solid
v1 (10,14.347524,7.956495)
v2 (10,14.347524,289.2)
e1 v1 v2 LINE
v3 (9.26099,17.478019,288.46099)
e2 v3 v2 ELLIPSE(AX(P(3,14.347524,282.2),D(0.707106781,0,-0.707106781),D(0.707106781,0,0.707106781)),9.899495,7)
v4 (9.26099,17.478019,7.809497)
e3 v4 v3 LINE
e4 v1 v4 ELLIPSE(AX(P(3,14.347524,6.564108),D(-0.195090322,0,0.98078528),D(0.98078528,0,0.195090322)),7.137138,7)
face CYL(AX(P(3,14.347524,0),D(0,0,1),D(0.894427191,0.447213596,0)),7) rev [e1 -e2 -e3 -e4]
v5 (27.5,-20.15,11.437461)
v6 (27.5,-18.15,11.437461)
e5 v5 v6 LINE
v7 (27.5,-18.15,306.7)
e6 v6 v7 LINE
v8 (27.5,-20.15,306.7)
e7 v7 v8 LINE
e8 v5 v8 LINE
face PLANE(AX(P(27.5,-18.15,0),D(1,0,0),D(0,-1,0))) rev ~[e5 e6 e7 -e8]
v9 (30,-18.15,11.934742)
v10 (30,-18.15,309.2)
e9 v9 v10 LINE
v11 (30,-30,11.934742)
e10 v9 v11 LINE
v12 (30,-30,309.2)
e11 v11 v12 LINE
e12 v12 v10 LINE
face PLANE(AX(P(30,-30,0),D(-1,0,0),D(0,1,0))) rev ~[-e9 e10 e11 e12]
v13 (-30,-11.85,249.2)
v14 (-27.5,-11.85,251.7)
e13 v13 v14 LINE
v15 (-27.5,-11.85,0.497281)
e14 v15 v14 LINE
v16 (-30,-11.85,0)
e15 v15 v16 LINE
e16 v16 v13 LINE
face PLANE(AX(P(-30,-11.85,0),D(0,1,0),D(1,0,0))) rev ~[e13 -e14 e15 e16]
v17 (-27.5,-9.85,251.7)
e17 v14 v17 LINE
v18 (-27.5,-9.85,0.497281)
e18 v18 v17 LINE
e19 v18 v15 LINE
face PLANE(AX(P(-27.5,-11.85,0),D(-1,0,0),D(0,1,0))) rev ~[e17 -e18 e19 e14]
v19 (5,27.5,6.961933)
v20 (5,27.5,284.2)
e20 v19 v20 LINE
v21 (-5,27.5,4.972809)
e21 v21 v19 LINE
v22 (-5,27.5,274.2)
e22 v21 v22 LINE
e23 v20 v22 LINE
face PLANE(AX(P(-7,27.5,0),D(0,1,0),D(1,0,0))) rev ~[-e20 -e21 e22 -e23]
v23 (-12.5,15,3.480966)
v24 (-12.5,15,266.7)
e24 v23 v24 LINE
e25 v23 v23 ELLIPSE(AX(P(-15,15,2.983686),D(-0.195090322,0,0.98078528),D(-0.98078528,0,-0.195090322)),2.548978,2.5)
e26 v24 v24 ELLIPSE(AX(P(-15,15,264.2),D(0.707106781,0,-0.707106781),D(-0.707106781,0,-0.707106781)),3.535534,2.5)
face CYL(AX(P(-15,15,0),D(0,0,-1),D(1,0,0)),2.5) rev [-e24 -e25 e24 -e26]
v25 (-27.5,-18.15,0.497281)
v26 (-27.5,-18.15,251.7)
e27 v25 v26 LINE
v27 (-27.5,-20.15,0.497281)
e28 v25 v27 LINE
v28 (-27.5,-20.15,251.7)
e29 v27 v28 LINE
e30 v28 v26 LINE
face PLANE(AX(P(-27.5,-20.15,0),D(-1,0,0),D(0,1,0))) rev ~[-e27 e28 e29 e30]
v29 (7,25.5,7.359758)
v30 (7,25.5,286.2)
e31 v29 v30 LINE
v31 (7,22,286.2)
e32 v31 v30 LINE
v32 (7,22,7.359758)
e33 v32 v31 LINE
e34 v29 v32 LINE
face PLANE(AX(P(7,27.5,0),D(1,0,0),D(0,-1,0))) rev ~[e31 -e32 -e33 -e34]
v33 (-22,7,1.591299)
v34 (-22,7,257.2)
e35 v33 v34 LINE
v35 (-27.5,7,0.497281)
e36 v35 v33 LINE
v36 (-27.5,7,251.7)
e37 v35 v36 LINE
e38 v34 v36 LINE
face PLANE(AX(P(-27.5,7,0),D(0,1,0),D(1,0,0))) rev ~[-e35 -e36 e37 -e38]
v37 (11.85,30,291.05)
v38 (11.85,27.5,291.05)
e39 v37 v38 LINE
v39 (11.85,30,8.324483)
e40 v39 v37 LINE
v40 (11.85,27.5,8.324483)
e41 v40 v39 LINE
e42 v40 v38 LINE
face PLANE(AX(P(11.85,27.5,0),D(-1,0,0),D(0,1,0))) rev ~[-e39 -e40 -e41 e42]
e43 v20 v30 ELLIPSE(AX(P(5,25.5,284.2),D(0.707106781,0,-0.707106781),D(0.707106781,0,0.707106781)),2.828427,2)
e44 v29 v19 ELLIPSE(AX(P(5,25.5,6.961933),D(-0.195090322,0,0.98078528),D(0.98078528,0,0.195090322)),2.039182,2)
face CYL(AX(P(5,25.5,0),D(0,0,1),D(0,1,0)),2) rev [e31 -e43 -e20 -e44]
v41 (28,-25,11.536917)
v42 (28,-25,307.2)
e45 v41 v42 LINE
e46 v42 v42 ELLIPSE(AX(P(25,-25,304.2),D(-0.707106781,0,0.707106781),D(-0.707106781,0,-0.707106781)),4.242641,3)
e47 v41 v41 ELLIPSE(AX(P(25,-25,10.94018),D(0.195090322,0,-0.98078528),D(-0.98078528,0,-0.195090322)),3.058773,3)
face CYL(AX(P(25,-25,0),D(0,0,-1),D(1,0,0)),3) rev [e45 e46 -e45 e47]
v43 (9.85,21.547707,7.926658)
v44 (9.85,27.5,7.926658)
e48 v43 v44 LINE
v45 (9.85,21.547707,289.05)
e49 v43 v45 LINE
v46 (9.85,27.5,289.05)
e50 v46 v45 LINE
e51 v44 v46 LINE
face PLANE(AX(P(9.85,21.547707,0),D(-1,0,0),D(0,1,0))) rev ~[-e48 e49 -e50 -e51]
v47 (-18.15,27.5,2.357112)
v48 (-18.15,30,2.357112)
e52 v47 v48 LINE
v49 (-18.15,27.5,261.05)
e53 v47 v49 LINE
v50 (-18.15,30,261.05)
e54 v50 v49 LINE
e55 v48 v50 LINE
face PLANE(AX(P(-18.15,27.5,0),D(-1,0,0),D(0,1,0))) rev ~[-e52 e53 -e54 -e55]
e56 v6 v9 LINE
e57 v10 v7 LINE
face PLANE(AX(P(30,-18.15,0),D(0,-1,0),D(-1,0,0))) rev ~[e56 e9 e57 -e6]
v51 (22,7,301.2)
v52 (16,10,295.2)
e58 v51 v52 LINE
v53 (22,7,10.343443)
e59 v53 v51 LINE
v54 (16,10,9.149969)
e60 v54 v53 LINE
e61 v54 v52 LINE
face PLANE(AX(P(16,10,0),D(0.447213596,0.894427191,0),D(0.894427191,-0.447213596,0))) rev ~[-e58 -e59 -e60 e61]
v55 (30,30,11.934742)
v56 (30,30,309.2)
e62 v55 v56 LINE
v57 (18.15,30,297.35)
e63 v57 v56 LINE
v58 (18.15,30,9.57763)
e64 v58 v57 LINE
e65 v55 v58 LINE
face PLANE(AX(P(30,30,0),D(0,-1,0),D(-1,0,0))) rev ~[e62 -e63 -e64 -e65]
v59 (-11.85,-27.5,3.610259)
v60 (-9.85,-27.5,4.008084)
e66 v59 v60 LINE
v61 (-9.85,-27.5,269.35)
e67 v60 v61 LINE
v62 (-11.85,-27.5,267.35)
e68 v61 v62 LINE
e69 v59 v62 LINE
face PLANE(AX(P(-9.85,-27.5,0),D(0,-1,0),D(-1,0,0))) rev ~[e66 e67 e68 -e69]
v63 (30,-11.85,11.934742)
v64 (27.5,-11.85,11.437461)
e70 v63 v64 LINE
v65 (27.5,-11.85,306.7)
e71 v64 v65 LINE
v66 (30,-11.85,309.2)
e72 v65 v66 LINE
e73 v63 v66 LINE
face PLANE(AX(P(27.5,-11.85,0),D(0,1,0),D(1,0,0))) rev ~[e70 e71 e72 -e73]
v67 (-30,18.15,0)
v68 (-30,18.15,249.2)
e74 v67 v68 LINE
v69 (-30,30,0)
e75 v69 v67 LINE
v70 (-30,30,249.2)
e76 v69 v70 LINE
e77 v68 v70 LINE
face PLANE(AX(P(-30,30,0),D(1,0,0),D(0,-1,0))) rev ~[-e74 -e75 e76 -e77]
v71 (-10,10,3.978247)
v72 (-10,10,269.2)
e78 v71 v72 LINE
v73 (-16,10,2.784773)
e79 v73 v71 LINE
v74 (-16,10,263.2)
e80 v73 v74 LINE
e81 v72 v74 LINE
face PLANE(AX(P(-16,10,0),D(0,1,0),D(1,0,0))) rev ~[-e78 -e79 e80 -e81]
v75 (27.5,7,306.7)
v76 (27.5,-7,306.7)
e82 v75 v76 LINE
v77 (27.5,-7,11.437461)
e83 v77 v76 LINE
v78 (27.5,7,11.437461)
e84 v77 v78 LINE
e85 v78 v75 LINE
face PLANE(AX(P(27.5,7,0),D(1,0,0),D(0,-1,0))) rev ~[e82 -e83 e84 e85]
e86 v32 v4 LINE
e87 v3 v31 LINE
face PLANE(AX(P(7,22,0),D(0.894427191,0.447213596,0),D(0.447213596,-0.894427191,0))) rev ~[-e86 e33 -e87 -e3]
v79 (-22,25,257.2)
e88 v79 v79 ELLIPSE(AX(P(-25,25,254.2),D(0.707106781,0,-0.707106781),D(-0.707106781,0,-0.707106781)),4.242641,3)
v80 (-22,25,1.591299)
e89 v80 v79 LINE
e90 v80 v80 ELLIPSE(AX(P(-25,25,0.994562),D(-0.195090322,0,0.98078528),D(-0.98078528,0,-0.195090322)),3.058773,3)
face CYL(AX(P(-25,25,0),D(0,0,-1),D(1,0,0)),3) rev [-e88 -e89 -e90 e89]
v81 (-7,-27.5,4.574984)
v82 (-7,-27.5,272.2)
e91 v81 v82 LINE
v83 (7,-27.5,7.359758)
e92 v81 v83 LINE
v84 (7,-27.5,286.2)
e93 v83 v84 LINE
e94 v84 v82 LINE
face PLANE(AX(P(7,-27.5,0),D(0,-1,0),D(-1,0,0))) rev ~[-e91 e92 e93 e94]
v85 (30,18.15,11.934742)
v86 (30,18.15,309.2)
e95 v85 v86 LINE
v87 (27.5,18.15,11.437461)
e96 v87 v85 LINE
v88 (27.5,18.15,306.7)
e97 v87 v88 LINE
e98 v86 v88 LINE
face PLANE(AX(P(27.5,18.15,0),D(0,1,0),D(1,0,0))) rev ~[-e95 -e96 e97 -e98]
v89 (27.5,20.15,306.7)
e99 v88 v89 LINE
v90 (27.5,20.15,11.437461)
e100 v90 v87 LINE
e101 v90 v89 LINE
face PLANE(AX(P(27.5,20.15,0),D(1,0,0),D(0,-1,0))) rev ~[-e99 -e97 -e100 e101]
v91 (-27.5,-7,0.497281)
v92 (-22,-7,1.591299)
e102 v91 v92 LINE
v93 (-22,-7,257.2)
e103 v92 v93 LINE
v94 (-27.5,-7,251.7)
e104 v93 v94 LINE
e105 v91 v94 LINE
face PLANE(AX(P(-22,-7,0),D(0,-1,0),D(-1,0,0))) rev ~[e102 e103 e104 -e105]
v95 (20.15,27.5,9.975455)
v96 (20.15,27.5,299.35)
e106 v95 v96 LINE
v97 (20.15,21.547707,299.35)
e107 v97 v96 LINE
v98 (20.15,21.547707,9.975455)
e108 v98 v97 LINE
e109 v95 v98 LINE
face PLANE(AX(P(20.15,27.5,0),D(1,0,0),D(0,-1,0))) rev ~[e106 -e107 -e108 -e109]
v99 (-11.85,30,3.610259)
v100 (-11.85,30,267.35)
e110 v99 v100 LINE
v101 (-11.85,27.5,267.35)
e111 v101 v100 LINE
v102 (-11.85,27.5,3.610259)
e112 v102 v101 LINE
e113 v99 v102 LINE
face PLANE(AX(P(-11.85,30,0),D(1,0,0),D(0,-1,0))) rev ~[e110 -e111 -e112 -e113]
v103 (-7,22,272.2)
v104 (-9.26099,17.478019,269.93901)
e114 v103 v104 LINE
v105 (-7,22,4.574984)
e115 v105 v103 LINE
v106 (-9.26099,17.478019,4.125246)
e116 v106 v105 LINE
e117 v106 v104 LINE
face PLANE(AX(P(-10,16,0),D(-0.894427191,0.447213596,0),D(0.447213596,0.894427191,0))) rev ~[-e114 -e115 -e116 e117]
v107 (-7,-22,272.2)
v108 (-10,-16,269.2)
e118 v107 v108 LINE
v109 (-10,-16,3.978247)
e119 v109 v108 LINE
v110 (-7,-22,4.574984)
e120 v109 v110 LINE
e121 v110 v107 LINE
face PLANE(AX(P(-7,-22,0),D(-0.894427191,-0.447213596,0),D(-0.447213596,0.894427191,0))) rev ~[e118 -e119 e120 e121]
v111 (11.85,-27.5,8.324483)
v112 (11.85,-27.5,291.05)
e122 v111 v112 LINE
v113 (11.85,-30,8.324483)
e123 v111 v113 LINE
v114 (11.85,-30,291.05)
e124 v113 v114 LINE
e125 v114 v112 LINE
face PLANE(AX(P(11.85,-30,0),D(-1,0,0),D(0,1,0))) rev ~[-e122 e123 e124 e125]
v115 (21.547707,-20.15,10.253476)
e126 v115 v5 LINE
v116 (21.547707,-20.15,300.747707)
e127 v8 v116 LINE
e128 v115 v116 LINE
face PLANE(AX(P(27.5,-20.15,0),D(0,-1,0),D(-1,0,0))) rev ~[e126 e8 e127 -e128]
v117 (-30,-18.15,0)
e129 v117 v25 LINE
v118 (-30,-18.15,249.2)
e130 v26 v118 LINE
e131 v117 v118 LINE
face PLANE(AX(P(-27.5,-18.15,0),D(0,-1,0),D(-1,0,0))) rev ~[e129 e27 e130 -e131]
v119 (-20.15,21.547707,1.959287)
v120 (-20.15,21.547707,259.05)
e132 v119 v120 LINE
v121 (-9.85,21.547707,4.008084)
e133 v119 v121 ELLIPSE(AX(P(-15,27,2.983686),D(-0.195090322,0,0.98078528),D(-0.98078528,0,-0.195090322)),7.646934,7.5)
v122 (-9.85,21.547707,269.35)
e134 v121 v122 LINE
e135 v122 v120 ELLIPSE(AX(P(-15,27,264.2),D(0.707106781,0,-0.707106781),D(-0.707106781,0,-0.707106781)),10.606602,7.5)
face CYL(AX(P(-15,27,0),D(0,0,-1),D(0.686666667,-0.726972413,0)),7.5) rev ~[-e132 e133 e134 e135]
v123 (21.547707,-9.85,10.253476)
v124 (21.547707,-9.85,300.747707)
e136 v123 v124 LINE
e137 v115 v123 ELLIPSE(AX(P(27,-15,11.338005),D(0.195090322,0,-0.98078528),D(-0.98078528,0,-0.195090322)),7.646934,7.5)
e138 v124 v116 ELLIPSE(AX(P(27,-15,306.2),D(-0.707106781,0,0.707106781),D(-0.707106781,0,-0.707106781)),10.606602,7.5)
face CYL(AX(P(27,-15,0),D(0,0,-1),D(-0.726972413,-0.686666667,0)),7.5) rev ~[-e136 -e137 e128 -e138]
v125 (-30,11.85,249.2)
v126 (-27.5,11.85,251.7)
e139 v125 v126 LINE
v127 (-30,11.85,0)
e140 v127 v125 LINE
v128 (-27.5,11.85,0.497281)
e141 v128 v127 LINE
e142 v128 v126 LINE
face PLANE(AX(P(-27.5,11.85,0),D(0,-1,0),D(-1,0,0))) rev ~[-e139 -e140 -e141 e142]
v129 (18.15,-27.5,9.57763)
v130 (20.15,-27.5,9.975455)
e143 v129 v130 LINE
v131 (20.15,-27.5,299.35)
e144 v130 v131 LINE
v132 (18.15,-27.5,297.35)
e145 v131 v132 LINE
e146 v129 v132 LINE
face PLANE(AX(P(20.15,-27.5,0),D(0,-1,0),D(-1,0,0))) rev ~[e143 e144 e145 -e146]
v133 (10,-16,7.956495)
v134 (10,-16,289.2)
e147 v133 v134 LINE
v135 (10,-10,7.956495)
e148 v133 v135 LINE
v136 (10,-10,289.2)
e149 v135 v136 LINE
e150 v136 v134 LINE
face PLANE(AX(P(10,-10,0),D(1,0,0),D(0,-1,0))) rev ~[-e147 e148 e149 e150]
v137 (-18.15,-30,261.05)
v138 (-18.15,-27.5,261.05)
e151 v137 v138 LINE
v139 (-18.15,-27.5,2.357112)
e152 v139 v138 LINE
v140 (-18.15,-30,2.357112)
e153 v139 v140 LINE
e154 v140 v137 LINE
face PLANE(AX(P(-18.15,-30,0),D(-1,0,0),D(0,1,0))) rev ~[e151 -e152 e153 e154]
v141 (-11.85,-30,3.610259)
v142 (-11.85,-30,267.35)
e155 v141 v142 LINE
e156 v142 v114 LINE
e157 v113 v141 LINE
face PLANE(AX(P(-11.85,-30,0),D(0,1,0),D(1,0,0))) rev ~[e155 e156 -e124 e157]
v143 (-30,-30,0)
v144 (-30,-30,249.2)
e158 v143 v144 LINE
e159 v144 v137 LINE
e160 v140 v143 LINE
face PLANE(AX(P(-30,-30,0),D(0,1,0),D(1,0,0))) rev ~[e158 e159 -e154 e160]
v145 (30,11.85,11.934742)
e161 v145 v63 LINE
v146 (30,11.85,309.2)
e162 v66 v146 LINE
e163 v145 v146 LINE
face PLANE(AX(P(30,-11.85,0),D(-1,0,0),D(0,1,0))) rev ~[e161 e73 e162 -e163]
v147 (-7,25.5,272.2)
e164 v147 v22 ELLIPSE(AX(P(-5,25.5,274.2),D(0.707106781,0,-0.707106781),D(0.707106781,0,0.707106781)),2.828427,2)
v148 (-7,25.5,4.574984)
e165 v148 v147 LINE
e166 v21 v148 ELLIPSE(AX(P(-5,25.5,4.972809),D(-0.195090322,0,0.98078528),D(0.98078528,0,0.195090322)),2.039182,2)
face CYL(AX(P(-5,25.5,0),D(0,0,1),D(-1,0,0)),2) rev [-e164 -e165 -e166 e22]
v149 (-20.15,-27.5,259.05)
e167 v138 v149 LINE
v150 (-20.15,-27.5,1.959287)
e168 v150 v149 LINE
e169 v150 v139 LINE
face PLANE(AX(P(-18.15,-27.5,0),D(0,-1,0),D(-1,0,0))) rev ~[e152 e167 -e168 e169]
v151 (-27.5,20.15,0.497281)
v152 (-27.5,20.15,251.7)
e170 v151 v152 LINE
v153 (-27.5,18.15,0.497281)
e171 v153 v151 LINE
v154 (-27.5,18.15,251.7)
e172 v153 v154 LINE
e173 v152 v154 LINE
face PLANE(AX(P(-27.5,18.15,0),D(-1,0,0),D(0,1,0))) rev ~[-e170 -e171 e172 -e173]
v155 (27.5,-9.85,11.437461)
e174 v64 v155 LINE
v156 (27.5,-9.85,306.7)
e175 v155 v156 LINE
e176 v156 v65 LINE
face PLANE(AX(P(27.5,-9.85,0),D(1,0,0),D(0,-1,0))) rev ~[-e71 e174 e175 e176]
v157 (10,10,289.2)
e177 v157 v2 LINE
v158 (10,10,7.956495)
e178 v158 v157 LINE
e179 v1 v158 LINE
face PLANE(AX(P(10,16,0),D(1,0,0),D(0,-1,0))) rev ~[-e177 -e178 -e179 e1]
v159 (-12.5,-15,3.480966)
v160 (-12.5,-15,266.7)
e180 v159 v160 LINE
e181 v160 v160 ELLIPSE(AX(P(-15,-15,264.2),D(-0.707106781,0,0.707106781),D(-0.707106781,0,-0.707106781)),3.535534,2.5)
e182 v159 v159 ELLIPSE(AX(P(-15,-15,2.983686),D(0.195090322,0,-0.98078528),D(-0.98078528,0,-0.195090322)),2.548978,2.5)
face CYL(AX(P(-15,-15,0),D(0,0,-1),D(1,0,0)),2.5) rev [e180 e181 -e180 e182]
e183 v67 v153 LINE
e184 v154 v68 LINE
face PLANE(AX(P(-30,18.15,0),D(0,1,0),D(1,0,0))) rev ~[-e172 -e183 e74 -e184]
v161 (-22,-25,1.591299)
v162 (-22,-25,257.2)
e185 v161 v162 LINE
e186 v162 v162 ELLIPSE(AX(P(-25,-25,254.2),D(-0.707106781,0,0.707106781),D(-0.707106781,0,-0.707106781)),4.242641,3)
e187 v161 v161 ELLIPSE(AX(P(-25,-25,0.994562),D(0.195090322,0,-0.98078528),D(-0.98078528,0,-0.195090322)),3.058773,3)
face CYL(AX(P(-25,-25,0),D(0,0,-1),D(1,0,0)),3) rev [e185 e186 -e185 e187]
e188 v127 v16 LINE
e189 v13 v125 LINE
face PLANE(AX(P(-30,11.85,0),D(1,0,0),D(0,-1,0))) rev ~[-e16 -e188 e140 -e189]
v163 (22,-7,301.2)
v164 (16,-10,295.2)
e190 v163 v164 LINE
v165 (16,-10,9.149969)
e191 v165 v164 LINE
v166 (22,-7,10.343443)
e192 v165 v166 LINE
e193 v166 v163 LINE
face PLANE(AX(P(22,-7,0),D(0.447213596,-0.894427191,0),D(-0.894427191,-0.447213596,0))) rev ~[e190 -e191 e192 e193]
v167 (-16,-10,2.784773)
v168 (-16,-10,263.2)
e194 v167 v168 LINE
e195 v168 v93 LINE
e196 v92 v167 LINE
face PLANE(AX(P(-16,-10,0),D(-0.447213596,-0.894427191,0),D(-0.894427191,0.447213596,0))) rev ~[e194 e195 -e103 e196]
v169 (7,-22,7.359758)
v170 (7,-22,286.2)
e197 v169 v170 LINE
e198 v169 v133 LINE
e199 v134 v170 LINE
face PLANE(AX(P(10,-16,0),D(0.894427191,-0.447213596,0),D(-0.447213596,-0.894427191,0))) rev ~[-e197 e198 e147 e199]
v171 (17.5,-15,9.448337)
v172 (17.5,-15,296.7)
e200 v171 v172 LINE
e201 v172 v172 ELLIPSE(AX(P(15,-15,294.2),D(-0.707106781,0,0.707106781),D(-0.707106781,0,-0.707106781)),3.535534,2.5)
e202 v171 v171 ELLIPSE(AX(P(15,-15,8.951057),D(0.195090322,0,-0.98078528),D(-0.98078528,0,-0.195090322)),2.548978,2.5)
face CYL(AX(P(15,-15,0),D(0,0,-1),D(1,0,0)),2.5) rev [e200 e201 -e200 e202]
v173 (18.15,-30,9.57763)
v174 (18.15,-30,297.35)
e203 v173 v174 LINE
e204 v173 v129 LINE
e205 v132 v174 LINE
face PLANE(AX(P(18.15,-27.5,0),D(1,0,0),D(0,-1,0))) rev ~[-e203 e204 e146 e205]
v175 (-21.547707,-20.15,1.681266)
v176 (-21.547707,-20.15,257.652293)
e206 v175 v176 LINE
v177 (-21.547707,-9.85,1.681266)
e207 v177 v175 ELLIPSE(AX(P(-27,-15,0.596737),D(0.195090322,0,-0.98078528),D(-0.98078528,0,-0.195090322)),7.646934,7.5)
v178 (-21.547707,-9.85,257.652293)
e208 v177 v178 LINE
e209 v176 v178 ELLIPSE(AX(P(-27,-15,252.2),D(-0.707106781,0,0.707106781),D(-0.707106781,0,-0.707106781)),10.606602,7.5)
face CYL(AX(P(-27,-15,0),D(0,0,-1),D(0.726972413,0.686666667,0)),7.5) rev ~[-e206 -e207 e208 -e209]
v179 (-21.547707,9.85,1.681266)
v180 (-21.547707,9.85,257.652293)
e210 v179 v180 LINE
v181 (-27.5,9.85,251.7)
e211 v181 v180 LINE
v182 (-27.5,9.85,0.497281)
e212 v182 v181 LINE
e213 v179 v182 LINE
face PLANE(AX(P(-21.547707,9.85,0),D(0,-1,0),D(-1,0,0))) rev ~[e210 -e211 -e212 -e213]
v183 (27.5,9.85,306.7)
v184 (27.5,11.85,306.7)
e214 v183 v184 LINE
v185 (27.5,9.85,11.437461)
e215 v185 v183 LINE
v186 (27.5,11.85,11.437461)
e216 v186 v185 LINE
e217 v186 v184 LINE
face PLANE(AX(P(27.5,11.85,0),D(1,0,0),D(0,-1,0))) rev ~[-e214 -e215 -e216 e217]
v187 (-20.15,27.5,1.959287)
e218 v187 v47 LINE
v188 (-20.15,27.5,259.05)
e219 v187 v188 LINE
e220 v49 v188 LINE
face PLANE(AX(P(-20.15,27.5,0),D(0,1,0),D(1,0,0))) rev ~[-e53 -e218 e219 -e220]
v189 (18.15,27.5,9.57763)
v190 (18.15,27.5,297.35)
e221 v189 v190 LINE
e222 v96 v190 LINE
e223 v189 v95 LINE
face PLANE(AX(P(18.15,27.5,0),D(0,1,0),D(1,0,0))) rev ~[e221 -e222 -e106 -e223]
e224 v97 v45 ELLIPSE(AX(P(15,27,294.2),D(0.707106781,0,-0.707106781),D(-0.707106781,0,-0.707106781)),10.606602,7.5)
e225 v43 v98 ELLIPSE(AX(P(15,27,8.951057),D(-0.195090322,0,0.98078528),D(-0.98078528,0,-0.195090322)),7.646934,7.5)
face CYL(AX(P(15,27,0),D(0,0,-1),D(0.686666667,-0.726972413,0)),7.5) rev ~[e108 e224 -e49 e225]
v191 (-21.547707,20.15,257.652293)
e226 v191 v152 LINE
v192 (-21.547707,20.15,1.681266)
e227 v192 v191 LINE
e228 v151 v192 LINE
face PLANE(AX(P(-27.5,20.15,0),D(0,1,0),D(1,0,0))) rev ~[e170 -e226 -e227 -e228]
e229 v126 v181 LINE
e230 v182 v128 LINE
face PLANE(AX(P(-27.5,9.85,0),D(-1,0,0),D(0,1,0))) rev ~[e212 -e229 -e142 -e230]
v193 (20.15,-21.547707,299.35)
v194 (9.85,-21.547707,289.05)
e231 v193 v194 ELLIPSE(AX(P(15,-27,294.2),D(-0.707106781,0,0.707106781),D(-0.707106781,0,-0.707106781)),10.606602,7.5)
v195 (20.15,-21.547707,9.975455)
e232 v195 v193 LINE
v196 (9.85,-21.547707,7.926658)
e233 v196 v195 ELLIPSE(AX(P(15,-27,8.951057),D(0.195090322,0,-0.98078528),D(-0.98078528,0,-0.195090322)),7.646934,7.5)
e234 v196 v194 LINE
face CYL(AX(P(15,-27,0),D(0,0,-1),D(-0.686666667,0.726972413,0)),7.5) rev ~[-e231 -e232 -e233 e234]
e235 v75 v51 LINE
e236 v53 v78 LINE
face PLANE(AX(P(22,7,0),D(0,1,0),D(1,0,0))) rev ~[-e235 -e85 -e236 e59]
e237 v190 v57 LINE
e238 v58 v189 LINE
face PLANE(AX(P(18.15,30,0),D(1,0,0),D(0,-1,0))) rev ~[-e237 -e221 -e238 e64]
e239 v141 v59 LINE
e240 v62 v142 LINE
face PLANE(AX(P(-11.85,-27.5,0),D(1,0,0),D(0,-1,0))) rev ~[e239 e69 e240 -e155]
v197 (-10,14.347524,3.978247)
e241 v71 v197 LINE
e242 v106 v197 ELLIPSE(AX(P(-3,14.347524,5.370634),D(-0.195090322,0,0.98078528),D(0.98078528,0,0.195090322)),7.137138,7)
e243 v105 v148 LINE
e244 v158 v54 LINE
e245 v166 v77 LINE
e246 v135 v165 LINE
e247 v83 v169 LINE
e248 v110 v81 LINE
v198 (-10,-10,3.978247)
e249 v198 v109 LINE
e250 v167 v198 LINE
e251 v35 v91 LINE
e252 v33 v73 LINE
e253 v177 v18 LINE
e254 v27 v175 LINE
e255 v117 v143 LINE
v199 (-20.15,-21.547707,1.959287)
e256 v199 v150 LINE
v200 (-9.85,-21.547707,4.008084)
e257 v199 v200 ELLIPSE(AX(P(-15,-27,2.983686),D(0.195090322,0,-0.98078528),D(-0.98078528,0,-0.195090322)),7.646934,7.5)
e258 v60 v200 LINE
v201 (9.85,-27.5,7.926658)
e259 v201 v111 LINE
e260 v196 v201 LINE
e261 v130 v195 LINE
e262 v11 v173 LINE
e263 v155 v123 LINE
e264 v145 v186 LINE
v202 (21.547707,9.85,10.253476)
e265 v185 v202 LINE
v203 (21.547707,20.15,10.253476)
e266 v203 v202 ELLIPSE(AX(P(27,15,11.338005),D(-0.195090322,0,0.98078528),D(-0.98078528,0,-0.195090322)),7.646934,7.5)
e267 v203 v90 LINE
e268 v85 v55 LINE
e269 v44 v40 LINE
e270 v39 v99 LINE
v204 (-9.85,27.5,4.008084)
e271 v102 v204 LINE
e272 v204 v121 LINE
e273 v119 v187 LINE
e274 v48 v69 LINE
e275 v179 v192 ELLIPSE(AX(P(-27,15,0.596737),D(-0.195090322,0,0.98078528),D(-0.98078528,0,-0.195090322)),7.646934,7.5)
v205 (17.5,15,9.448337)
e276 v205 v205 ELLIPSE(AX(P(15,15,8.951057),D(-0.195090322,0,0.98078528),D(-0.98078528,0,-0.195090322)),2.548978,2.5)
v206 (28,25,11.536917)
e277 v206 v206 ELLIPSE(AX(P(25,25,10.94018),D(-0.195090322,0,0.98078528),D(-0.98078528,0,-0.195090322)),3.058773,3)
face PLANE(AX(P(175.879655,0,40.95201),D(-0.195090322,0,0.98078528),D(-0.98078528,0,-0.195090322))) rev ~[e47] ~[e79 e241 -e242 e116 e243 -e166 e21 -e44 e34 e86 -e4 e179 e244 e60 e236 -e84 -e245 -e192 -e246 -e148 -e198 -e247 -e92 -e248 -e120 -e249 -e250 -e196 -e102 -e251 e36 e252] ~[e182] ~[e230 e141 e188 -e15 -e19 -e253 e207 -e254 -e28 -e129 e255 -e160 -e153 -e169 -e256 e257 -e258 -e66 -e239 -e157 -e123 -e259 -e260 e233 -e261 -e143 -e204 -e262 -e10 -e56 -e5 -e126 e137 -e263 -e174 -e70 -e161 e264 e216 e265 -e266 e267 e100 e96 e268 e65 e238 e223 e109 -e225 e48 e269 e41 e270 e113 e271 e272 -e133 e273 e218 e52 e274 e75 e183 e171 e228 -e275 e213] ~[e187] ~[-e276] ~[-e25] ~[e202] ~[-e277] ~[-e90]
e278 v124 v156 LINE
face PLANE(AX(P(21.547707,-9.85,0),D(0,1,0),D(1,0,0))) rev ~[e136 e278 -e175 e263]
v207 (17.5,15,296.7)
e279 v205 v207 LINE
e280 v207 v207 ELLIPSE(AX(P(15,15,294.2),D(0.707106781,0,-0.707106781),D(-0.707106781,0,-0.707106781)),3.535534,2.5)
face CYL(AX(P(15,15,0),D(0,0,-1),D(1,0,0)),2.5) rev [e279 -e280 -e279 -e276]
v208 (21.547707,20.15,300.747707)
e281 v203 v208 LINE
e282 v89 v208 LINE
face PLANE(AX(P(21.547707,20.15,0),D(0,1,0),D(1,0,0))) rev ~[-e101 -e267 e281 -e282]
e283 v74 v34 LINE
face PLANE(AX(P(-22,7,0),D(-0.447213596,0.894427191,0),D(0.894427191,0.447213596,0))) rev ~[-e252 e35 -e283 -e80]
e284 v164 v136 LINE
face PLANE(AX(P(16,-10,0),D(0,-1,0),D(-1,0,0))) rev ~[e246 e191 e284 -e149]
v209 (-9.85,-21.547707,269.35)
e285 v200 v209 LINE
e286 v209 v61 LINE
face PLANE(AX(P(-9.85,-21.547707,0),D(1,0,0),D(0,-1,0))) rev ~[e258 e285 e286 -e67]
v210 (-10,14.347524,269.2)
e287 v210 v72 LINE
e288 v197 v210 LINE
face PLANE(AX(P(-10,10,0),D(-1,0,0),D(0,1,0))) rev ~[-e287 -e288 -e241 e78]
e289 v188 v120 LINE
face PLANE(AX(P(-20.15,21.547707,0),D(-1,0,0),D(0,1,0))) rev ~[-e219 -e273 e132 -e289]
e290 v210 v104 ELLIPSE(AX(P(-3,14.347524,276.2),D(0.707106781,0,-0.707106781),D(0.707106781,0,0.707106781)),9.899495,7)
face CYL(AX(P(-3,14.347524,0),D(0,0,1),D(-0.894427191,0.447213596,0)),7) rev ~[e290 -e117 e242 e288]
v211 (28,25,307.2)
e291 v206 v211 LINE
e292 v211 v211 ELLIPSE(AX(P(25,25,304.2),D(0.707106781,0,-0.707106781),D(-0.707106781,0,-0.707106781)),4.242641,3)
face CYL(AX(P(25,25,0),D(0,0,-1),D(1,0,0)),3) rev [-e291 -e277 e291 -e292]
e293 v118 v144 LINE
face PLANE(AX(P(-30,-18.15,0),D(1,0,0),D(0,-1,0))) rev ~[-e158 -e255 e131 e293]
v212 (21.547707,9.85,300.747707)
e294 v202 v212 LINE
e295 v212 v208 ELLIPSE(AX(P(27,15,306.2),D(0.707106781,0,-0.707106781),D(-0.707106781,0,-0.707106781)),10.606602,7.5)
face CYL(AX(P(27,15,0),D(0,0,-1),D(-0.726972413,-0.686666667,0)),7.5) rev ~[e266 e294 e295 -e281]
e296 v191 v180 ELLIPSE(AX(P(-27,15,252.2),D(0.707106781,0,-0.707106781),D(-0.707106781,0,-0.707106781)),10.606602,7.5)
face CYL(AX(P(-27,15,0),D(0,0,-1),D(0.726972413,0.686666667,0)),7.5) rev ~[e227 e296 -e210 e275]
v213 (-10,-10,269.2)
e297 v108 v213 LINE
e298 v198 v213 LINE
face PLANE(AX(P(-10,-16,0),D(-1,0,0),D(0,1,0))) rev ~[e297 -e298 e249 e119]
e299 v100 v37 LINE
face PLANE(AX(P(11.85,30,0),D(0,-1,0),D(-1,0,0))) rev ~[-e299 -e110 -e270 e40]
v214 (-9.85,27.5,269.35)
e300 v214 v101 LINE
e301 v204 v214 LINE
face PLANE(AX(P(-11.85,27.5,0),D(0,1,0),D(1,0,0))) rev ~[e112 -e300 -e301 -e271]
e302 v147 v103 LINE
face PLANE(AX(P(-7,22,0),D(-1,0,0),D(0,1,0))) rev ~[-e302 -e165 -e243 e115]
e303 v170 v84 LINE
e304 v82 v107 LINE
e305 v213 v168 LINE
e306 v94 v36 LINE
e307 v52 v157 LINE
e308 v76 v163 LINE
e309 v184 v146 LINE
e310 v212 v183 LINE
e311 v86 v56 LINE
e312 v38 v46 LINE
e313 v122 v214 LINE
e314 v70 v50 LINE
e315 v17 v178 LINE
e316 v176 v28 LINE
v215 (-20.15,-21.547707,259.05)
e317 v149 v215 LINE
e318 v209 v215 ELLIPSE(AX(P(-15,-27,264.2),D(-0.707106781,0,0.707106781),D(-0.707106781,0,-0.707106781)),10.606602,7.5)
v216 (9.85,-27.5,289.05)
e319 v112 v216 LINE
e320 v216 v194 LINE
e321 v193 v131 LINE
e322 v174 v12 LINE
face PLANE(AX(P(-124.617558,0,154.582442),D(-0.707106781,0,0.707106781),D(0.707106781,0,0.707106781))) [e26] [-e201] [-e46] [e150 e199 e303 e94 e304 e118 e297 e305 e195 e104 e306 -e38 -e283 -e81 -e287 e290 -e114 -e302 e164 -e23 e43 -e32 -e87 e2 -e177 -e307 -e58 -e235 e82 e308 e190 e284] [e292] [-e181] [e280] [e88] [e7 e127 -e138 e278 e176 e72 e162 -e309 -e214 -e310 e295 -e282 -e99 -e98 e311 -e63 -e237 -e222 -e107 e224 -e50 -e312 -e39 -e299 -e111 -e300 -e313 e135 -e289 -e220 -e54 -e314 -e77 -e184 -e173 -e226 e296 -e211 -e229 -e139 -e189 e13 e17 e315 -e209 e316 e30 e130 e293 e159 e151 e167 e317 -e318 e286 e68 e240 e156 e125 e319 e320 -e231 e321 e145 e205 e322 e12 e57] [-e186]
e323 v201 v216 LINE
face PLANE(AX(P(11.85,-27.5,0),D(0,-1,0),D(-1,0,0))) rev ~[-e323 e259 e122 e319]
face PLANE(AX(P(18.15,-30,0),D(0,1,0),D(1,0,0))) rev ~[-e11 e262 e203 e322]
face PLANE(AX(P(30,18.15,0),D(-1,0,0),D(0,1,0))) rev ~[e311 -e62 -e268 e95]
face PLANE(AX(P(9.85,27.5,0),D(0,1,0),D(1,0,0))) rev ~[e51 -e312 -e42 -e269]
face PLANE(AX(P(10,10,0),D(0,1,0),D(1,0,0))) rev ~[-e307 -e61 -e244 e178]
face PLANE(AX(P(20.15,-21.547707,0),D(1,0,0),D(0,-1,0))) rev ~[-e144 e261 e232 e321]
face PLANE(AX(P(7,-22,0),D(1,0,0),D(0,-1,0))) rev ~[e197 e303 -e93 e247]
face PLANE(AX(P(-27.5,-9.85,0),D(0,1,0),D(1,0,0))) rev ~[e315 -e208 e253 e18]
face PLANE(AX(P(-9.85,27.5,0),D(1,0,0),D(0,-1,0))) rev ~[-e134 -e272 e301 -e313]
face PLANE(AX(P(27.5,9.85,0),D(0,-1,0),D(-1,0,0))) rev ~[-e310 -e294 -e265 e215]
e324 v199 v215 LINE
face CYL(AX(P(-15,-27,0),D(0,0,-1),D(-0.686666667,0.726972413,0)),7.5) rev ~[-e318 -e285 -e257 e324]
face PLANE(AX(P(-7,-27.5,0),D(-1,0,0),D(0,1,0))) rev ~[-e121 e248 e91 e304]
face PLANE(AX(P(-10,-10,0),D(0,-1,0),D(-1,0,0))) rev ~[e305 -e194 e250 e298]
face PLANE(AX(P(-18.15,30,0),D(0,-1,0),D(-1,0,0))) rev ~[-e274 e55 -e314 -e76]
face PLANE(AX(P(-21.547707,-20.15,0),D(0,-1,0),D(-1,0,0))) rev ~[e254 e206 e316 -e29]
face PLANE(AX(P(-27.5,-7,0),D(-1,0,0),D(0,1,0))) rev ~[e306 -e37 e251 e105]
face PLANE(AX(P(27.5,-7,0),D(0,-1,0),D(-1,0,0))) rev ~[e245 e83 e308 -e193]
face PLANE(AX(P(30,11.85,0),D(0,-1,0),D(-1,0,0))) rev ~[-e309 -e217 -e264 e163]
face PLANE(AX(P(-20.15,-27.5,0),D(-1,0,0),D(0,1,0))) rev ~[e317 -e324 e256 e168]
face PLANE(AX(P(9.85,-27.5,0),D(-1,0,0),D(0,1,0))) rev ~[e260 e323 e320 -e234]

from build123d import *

# Parameters (mm, degrees)
F0_R          = 3
F0_R_2        = 2.5
F1_DEPTH      = 309.2
F2_R          = 2
F3_R          = 7
F6_DEPTH      = 30
F6_DEPTH_BACK = 30


# Not quite as in the source:
# - a feature names something its author has since deleted; it is built from what else it names


with BuildPart() as f1:
    # F0 (on Top) → F1 (new body)
    with BuildSketch(Plane.XY):
        with BuildLine():
            Line((18.15, -30), (30, -30))
            Line((30, -30), (30, -18.15))
            Line((30, -18.15), (27.5, -18.15))
            Line((27.5, -18.15), (27.5, -20.15))
            Line((27.5, -20.15), (21.5477069044, -20.15))
            ThreePointArc((21.5477069044, -20.15), (19.5, -15), (21.5477069044, -9.85))
            Line((21.5477069044, -9.85), (27.5, -9.85))
            Line((27.5, -9.85), (27.5, -11.85))
            Line((27.5, -11.85), (30, -11.85))
            Line((30, -11.85), (30, 11.85))
            Line((30, 11.85), (27.5, 11.85))
            Line((27.5, 11.85), (27.5, 9.85))
            Line((27.5, 9.85), (21.5477069044, 9.85))
            ThreePointArc((21.5477069044, 9.85), (19.5, 15), (21.5477069044, 20.15))
            Line((21.5477069044, 20.15), (27.5, 20.15))
            Line((27.5, 20.15), (27.5, 18.15))
            Line((27.5, 18.15), (30, 18.15))
            Line((30, 18.15), (30, 30))
            Line((30, 30), (18.15, 30))
            Line((18.15, 30), (18.15, 27.5))
            Line((18.15, 27.5), (20.15, 27.5))
            Line((20.15, 27.5), (20.15, 21.5477069044))
            ThreePointArc((20.15, 21.5477069044), (15, 19.5), (9.85, 21.5477069044))
            Line((9.85, 21.5477069044), (9.85, 27.5))
            Line((9.85, 27.5), (11.85, 27.5))
            Line((11.85, 27.5), (11.85, 30))
            Line((11.85, 30), (-11.85, 30))
            Line((-11.85, 30), (-11.85, 27.5))
            Line((-11.85, 27.5), (-9.85, 27.5))
            Line((-9.85, 27.5), (-9.85, 21.5477069044))
            ThreePointArc((-9.85, 21.5477069044), (-15, 19.5), (-20.15, 21.5477069044))
            Line((-20.15, 21.5477069044), (-20.15, 27.5))
            Line((-20.15, 27.5), (-18.15, 27.5))
            Line((-18.15, 27.5), (-18.15, 30))
            Line((-18.15, 30), (-30, 30))
            Line((-30, 30), (-30, 18.15))
            Line((-30, 18.15), (-27.5, 18.15))
            Line((-27.5, 18.15), (-27.5, 20.15))
            Line((-27.5, 20.15), (-21.5477069044, 20.15))
            ThreePointArc((-21.5477069044, 20.15), (-19.5, 15), (-21.5477069044, 9.85))
            Line((-21.5477069044, 9.85), (-27.5, 9.85))
            Line((-27.5, 9.85), (-27.5, 11.85))
            Line((-27.5, 11.85), (-30, 11.85))
            Line((-30, 11.85), (-30, -11.85))
            Line((-30, -11.85), (-27.5, -11.85))
            Line((-27.5, -11.85), (-27.5, -9.85))
            Line((-27.5, -9.85), (-21.5477069044, -9.85))
            ThreePointArc((-21.5477069044, -9.85), (-19.5, -15), (-21.5477069044, -20.15))
            Line((-21.5477069044, -20.15), (-27.5, -20.15))
            Line((-27.5, -20.15), (-27.5, -18.15))
            Line((-27.5, -18.15), (-30, -18.15))
            Line((-30, -18.15), (-30, -30))
            Line((-30, -30), (-18.15, -30))
            Line((-18.15, -30), (-18.15, -27.5))
            Line((-18.15, -27.5), (-20.15, -27.5))
            Line((-20.15, -27.5), (-20.15, -21.5477069044))
            ThreePointArc((-20.15, -21.5477069044), (-15, -19.5), (-9.85, -21.5477069044))
            Line((-9.85, -21.5477069044), (-9.85, -27.5))
            Line((-9.85, -27.5), (-11.85, -27.5))
            Line((-11.85, -27.5), (-11.85, -30))
            Line((-11.85, -30), (11.85, -30))
            Line((11.85, -30), (11.85, -27.5))
            Line((11.85, -27.5), (9.85, -27.5))
            Line((9.85, -27.5), (9.85, -21.5477069044))
            ThreePointArc((9.85, -21.5477069044), (15, -19.5), (20.15, -21.5477069044))
            Line((20.15, -21.5477069044), (20.15, -27.5))
            Line((20.15, -27.5), (18.15, -27.5))
            Line((18.15, -27.5), (18.15, -30))
        make_face()
        with Locations((-25, -25)):
            Circle(F0_R, mode=Mode.SUBTRACT)
        with Locations((-15, -15)):
            Circle(F0_R_2, mode=Mode.SUBTRACT)
        with Locations((25, -25)):
            Circle(F0_R, mode=Mode.SUBTRACT)
        with Locations((15, -15)):
            Circle(F0_R_2, mode=Mode.SUBTRACT)
        with Locations((-25, 25)):
            Circle(F0_R, mode=Mode.SUBTRACT)
        with Locations((-15, 15)):
            Circle(F0_R_2, mode=Mode.SUBTRACT)
        Polygon((-7, 22), (-7, 27.5), (0, 27.5), (7, 27.5), (7, 22), (10, 16), (10, 10), (16, 10), (22, 7), (27.5, 7), (27.5, 0), (27.5, -7), (22, -7), (16, -10), (10, -10), (10, -16), (7, -22), (7, -27.5), (0, -27.5), (-7, -27.5), (-7, -22), (-10, -16), (-10, -10), (-16, -10), (-22, -7), (-27.5, -7), (-27.5, 0), (-27.5, 7), (-22, 7), (-16, 10), (-10, 10), (-10, 16), align=None, mode=Mode.SUBTRACT)
        with Locations((15, 15)):
            Circle(F0_R_2, mode=Mode.SUBTRACT)
        with Locations((25, 25)):
            Circle(F0_R, mode=Mode.SUBTRACT)
    extrude(amount=F1_DEPTH)

    # F2
    f2_edges = [f1.edges().sort_by_distance(p)[0] for p in [
        (-7, 27.5, 154.6),
        (7, 27.5, 154.6),
    ]]
    fillet(f2_edges, radius=F2_R)

    # F3
    f3_edges = [f1.edges().sort_by_distance(p)[0] for p in [
        (-10, 16, 154.6),
        (10, 16, 154.6),
    ]]
    fillet(f3_edges, radius=F3_R)

    # F5 (on Front) → F6 (cut, two sides)
    with BuildSketch(Plane.XZ) as f6_sk:
        Polygon((199.6708250374, -78.6542790774), (175.8796550084, 40.952009573), (-30, 0), (-6.208829971, -119.6062886505), align=None)
        Polygon((30, 309.2), (-52.0743704197, 391.2743704197), (-206.6919281066, 236.6568127329), (-124.6175576868, 154.5824423132), align=None)
    extrude(amount=F6_DEPTH, mode=Mode.SUBTRACT)
    extrude(f6_sk.sketch, amount=-F6_DEPTH_BACK, mode=Mode.SUBTRACT)


solid = f1.part
